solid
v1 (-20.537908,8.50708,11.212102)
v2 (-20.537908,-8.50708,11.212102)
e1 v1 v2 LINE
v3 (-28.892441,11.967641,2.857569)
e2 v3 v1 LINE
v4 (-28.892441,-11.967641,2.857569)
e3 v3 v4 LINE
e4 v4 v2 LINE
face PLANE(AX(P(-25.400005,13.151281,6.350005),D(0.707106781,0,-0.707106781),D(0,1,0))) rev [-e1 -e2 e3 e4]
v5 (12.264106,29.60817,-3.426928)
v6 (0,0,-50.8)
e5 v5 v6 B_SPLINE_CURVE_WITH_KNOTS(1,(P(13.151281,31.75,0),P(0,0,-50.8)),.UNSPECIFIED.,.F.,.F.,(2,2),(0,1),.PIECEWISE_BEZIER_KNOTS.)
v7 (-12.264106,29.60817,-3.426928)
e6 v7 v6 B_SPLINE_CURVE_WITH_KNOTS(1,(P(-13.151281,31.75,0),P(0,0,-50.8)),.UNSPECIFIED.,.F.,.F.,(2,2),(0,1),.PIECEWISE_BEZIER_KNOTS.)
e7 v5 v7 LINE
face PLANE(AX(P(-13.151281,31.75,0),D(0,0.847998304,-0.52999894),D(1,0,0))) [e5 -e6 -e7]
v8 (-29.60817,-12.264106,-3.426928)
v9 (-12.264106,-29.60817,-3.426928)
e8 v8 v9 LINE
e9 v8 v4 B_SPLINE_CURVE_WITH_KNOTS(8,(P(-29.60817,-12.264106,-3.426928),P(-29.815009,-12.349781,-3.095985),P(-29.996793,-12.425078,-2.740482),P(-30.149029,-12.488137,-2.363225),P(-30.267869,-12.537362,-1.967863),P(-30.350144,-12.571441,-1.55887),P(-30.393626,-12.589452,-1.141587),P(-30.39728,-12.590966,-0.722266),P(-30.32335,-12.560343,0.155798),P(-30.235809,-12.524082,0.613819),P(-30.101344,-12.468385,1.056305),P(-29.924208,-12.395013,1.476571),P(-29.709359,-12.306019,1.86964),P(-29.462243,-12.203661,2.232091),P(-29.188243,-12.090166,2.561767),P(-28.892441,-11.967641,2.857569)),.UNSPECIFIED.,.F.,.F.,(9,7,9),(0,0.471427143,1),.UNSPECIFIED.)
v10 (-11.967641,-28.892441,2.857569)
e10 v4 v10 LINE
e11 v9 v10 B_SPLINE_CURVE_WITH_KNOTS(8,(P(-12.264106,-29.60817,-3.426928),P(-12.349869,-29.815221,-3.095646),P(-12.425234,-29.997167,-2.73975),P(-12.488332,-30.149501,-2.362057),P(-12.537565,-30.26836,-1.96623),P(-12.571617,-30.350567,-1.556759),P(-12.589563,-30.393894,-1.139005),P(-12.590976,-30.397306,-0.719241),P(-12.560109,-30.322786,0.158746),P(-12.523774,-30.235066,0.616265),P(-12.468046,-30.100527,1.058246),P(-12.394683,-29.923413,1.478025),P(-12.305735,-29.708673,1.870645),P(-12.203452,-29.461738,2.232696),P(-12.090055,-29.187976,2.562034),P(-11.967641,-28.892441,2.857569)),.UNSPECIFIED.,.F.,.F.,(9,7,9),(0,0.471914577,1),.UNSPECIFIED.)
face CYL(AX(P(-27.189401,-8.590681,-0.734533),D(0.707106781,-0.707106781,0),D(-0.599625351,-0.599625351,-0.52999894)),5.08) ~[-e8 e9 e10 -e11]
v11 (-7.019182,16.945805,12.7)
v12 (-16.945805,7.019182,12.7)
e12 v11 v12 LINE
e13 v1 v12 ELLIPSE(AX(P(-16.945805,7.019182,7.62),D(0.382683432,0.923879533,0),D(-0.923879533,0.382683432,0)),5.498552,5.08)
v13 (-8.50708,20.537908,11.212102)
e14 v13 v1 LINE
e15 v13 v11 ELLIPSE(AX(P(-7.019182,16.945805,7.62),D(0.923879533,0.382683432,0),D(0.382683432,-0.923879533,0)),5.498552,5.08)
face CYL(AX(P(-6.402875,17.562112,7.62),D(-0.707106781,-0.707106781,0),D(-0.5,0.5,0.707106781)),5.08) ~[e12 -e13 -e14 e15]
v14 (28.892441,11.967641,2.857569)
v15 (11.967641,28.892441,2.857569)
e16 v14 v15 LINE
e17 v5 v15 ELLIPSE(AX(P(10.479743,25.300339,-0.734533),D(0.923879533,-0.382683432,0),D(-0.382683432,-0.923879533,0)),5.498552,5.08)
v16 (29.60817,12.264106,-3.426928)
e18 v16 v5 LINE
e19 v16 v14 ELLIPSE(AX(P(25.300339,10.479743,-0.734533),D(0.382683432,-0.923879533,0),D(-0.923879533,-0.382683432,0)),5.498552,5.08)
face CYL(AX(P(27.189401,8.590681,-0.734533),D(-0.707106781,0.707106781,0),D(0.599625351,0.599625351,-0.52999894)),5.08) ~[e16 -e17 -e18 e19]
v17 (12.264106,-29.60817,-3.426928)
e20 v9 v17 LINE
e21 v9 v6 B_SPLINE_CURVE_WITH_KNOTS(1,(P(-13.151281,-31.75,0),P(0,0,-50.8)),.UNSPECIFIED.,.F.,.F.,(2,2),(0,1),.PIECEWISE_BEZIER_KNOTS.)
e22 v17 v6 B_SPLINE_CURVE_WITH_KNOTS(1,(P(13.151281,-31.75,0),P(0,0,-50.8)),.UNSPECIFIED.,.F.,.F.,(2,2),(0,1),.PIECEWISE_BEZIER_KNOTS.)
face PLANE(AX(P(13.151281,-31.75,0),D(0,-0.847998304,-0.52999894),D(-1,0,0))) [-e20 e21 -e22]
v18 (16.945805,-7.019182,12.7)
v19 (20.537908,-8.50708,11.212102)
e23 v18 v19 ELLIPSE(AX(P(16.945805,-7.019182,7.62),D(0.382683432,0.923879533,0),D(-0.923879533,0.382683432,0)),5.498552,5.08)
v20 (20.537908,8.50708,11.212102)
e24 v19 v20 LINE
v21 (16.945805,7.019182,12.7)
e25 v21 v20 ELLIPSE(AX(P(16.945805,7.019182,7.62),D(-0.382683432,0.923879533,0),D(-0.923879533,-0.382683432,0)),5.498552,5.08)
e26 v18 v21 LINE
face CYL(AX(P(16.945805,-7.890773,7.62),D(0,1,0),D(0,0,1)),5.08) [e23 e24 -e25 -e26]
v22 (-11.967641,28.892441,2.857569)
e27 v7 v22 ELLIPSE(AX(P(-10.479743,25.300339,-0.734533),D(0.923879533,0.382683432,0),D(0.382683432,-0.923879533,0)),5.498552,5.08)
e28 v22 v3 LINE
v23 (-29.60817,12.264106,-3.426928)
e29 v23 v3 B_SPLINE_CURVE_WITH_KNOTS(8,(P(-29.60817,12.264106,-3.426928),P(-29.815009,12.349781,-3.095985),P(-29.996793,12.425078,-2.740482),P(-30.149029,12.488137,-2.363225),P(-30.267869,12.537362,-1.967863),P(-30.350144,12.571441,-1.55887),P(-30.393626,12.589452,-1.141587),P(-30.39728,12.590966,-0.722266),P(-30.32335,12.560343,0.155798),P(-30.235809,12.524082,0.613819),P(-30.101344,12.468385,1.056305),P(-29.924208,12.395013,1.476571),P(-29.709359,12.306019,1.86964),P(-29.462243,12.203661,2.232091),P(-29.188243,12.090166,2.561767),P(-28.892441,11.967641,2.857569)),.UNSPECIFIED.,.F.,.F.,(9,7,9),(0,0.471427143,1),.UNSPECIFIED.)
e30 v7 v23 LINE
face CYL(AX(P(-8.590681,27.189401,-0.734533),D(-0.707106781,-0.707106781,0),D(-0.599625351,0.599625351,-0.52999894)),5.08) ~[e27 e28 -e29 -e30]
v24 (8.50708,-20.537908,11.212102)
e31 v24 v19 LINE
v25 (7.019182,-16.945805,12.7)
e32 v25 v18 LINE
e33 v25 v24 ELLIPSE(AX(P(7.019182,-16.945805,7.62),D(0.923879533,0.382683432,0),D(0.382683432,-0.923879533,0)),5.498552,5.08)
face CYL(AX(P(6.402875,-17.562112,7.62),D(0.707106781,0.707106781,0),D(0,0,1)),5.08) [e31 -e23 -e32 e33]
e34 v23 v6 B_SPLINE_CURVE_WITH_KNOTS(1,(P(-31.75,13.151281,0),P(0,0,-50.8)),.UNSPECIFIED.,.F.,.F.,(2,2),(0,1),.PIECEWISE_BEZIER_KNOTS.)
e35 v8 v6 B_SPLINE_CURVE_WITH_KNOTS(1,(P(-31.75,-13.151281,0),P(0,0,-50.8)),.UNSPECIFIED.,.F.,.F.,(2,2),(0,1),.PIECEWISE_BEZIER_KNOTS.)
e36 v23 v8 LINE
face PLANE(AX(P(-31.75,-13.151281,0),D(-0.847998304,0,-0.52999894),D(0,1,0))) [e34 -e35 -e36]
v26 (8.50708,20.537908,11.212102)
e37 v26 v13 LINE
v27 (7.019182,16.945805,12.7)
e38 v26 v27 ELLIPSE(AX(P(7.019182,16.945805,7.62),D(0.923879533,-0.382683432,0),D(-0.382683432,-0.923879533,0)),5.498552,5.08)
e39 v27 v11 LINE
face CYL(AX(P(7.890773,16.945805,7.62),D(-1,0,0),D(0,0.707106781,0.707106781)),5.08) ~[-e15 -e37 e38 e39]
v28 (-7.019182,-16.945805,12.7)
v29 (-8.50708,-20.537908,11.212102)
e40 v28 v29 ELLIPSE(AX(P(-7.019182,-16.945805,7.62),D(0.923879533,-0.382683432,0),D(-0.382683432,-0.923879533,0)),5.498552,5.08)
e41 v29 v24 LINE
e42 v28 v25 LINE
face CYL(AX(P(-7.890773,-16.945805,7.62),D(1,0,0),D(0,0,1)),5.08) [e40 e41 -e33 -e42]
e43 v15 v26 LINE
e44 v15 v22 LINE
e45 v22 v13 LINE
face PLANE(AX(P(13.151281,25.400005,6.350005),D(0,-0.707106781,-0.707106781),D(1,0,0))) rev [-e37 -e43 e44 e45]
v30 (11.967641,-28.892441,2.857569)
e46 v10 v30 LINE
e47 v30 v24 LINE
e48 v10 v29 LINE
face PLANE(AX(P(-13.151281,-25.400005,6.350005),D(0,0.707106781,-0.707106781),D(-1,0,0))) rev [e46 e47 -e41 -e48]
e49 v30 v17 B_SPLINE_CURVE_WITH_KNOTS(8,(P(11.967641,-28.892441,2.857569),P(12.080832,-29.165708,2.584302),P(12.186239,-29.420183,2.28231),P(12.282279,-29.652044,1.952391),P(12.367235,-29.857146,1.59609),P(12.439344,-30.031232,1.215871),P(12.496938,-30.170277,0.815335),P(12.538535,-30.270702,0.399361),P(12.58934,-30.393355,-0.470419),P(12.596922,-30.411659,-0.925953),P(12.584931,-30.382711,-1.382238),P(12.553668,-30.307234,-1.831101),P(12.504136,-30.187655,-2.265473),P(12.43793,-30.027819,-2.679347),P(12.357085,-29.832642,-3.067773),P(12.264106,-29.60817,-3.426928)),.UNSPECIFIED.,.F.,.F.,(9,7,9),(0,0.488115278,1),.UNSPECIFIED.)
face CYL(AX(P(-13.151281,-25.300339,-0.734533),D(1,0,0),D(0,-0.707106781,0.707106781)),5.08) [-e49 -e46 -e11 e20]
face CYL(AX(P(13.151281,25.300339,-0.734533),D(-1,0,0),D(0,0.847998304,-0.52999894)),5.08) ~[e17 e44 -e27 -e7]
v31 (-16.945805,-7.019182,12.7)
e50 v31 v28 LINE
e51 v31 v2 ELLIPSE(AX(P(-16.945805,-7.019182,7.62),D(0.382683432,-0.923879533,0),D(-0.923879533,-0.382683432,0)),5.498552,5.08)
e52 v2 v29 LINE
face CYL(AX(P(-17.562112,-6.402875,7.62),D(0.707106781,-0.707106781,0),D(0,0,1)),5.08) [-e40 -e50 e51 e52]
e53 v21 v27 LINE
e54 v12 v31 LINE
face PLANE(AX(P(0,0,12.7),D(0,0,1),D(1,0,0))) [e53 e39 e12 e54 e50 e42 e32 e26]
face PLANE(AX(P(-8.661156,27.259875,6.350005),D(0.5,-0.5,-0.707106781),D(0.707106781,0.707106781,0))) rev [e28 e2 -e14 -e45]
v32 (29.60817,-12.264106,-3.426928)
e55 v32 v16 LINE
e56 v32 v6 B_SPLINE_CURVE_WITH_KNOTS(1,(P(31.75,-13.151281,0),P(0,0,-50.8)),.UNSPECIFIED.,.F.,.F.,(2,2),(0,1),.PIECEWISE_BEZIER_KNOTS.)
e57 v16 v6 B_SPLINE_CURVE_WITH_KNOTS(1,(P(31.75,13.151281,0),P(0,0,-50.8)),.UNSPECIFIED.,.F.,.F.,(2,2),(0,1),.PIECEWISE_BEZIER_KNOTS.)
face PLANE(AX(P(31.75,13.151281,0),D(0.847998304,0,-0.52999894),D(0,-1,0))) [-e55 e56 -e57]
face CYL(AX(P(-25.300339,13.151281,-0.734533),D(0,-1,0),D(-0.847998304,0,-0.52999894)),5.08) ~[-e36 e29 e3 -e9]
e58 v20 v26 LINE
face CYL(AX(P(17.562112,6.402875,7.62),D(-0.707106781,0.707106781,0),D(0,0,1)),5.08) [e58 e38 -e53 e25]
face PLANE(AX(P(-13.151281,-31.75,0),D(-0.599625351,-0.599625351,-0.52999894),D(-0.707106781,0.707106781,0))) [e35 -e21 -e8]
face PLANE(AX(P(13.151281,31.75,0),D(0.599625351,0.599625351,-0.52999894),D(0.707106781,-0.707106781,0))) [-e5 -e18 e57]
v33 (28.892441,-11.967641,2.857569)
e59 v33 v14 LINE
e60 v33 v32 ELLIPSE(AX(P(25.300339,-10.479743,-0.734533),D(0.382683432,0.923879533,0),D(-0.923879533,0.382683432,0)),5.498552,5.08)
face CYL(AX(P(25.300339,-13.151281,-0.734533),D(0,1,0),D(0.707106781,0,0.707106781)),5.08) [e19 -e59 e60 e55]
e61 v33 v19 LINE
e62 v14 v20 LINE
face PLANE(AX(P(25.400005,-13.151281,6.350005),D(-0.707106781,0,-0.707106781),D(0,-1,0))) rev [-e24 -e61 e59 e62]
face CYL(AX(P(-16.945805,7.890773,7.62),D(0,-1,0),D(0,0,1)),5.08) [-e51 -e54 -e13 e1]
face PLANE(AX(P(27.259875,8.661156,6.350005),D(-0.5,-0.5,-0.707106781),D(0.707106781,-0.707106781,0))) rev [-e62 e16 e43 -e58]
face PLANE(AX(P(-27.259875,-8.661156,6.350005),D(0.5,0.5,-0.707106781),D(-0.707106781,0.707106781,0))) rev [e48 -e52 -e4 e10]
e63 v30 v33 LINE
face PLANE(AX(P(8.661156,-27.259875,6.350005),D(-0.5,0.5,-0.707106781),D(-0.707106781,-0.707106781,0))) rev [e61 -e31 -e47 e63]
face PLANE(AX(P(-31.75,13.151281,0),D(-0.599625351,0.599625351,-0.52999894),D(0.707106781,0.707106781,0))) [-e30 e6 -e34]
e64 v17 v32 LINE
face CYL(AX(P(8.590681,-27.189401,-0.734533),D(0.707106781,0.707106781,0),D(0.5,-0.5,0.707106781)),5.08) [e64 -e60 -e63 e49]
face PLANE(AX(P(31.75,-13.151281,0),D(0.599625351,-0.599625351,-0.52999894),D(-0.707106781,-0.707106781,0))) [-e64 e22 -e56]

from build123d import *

# Parameters (mm, degrees)
F1_DEPTH = 12.7
F2_SIZE2 = 12.69999
F2_SIZE  = 12.69999
F6_R     = 5.08


# Not quite as in the source:
# - a fillet or chamfer is up to 0.001 mm smaller than in the source, because OpenCascade refuses the exact size


with BuildPart() as f1:
    # F0 (on Top) → F1 (new body)
    with BuildSketch(Plane.XY):
        Polygon((-31.75, 13.1512806053), (-31.75, -13.1512806053), (-13.1512806053, -31.75), (13.1512806053, -31.75), (31.75, -13.1512806053), (31.75, 13.1512806053), (13.1512806053, 31.75), (-13.1512806053, 31.75), align=None)
    extrude(amount=F1_DEPTH)

    # F2 (size 12.7 and 12.7 in the source; OpenCascade refuses exactly that, so slightly less here)
    f2_edges = [f1.edges().sort_by_distance(p)[0] for p in [
        (-22.45064, 22.45064, 12.7),
        (-31.75, 0, 12.7),
        (-22.45064, -22.45064, 12.7),
        (0, -31.75, 12.7),
        (22.45064, -22.45064, 12.7),
        (31.75, 0, 12.7),
        (22.45064, 22.45064, 12.7),
        (0, 31.75, 12.7),
    ]]
    chamfer(f2_edges, length=F2_SIZE, length2=F2_SIZE2)

    # F1_face (on face) → F5 section 0
    with BuildSketch(Plane(origin=(0, 0, 0), x_dir=(1, 0, 0), z_dir=(0, 0, -1)), mode=Mode.PRIVATE) as f5_s0:
        Polygon((-31.75, -13.1512806053), (-13.1512806053, -31.75), (13.1512806053, -31.75), (31.75, -13.1512806053), (31.75, 13.1512806053), (13.1512806053, 31.75), (-13.1512806053, 31.75), (-31.75, 13.1512806053), align=None)
    loft([f5_s0.sketch, Vertex(0, 0, -50.8)])

    # F6
    f6_edges = [f1.edges().sort_by_distance(p)[0] for p in [
        (-13.470391, 13.470391, 12.7),
        (0, 19.05001, 12.7),
        (-19.05001, 0, 12.7),
        (13.470391, 13.470391, 12.7),
        (-13.470391, -13.470391, 12.7),
        (19.05001, 0, 12.7),
        (0, -19.05001, 12.7),
        (13.470391, -13.470391, 12.7),
        (-22.45064, 22.45064, 1e-05),
        (0, 31.75, 1e-05),
        (-31.75, 0, 0),
        (22.45064, 22.45064, 0),
        (-22.45064, -22.45064, 0),
        (31.75, 0, 0),
        (0, -31.75, 0),
        (22.45064, -22.45064, 0),
    ]]
    fillet(f6_edges, radius=F6_R)


solid = f1.part
